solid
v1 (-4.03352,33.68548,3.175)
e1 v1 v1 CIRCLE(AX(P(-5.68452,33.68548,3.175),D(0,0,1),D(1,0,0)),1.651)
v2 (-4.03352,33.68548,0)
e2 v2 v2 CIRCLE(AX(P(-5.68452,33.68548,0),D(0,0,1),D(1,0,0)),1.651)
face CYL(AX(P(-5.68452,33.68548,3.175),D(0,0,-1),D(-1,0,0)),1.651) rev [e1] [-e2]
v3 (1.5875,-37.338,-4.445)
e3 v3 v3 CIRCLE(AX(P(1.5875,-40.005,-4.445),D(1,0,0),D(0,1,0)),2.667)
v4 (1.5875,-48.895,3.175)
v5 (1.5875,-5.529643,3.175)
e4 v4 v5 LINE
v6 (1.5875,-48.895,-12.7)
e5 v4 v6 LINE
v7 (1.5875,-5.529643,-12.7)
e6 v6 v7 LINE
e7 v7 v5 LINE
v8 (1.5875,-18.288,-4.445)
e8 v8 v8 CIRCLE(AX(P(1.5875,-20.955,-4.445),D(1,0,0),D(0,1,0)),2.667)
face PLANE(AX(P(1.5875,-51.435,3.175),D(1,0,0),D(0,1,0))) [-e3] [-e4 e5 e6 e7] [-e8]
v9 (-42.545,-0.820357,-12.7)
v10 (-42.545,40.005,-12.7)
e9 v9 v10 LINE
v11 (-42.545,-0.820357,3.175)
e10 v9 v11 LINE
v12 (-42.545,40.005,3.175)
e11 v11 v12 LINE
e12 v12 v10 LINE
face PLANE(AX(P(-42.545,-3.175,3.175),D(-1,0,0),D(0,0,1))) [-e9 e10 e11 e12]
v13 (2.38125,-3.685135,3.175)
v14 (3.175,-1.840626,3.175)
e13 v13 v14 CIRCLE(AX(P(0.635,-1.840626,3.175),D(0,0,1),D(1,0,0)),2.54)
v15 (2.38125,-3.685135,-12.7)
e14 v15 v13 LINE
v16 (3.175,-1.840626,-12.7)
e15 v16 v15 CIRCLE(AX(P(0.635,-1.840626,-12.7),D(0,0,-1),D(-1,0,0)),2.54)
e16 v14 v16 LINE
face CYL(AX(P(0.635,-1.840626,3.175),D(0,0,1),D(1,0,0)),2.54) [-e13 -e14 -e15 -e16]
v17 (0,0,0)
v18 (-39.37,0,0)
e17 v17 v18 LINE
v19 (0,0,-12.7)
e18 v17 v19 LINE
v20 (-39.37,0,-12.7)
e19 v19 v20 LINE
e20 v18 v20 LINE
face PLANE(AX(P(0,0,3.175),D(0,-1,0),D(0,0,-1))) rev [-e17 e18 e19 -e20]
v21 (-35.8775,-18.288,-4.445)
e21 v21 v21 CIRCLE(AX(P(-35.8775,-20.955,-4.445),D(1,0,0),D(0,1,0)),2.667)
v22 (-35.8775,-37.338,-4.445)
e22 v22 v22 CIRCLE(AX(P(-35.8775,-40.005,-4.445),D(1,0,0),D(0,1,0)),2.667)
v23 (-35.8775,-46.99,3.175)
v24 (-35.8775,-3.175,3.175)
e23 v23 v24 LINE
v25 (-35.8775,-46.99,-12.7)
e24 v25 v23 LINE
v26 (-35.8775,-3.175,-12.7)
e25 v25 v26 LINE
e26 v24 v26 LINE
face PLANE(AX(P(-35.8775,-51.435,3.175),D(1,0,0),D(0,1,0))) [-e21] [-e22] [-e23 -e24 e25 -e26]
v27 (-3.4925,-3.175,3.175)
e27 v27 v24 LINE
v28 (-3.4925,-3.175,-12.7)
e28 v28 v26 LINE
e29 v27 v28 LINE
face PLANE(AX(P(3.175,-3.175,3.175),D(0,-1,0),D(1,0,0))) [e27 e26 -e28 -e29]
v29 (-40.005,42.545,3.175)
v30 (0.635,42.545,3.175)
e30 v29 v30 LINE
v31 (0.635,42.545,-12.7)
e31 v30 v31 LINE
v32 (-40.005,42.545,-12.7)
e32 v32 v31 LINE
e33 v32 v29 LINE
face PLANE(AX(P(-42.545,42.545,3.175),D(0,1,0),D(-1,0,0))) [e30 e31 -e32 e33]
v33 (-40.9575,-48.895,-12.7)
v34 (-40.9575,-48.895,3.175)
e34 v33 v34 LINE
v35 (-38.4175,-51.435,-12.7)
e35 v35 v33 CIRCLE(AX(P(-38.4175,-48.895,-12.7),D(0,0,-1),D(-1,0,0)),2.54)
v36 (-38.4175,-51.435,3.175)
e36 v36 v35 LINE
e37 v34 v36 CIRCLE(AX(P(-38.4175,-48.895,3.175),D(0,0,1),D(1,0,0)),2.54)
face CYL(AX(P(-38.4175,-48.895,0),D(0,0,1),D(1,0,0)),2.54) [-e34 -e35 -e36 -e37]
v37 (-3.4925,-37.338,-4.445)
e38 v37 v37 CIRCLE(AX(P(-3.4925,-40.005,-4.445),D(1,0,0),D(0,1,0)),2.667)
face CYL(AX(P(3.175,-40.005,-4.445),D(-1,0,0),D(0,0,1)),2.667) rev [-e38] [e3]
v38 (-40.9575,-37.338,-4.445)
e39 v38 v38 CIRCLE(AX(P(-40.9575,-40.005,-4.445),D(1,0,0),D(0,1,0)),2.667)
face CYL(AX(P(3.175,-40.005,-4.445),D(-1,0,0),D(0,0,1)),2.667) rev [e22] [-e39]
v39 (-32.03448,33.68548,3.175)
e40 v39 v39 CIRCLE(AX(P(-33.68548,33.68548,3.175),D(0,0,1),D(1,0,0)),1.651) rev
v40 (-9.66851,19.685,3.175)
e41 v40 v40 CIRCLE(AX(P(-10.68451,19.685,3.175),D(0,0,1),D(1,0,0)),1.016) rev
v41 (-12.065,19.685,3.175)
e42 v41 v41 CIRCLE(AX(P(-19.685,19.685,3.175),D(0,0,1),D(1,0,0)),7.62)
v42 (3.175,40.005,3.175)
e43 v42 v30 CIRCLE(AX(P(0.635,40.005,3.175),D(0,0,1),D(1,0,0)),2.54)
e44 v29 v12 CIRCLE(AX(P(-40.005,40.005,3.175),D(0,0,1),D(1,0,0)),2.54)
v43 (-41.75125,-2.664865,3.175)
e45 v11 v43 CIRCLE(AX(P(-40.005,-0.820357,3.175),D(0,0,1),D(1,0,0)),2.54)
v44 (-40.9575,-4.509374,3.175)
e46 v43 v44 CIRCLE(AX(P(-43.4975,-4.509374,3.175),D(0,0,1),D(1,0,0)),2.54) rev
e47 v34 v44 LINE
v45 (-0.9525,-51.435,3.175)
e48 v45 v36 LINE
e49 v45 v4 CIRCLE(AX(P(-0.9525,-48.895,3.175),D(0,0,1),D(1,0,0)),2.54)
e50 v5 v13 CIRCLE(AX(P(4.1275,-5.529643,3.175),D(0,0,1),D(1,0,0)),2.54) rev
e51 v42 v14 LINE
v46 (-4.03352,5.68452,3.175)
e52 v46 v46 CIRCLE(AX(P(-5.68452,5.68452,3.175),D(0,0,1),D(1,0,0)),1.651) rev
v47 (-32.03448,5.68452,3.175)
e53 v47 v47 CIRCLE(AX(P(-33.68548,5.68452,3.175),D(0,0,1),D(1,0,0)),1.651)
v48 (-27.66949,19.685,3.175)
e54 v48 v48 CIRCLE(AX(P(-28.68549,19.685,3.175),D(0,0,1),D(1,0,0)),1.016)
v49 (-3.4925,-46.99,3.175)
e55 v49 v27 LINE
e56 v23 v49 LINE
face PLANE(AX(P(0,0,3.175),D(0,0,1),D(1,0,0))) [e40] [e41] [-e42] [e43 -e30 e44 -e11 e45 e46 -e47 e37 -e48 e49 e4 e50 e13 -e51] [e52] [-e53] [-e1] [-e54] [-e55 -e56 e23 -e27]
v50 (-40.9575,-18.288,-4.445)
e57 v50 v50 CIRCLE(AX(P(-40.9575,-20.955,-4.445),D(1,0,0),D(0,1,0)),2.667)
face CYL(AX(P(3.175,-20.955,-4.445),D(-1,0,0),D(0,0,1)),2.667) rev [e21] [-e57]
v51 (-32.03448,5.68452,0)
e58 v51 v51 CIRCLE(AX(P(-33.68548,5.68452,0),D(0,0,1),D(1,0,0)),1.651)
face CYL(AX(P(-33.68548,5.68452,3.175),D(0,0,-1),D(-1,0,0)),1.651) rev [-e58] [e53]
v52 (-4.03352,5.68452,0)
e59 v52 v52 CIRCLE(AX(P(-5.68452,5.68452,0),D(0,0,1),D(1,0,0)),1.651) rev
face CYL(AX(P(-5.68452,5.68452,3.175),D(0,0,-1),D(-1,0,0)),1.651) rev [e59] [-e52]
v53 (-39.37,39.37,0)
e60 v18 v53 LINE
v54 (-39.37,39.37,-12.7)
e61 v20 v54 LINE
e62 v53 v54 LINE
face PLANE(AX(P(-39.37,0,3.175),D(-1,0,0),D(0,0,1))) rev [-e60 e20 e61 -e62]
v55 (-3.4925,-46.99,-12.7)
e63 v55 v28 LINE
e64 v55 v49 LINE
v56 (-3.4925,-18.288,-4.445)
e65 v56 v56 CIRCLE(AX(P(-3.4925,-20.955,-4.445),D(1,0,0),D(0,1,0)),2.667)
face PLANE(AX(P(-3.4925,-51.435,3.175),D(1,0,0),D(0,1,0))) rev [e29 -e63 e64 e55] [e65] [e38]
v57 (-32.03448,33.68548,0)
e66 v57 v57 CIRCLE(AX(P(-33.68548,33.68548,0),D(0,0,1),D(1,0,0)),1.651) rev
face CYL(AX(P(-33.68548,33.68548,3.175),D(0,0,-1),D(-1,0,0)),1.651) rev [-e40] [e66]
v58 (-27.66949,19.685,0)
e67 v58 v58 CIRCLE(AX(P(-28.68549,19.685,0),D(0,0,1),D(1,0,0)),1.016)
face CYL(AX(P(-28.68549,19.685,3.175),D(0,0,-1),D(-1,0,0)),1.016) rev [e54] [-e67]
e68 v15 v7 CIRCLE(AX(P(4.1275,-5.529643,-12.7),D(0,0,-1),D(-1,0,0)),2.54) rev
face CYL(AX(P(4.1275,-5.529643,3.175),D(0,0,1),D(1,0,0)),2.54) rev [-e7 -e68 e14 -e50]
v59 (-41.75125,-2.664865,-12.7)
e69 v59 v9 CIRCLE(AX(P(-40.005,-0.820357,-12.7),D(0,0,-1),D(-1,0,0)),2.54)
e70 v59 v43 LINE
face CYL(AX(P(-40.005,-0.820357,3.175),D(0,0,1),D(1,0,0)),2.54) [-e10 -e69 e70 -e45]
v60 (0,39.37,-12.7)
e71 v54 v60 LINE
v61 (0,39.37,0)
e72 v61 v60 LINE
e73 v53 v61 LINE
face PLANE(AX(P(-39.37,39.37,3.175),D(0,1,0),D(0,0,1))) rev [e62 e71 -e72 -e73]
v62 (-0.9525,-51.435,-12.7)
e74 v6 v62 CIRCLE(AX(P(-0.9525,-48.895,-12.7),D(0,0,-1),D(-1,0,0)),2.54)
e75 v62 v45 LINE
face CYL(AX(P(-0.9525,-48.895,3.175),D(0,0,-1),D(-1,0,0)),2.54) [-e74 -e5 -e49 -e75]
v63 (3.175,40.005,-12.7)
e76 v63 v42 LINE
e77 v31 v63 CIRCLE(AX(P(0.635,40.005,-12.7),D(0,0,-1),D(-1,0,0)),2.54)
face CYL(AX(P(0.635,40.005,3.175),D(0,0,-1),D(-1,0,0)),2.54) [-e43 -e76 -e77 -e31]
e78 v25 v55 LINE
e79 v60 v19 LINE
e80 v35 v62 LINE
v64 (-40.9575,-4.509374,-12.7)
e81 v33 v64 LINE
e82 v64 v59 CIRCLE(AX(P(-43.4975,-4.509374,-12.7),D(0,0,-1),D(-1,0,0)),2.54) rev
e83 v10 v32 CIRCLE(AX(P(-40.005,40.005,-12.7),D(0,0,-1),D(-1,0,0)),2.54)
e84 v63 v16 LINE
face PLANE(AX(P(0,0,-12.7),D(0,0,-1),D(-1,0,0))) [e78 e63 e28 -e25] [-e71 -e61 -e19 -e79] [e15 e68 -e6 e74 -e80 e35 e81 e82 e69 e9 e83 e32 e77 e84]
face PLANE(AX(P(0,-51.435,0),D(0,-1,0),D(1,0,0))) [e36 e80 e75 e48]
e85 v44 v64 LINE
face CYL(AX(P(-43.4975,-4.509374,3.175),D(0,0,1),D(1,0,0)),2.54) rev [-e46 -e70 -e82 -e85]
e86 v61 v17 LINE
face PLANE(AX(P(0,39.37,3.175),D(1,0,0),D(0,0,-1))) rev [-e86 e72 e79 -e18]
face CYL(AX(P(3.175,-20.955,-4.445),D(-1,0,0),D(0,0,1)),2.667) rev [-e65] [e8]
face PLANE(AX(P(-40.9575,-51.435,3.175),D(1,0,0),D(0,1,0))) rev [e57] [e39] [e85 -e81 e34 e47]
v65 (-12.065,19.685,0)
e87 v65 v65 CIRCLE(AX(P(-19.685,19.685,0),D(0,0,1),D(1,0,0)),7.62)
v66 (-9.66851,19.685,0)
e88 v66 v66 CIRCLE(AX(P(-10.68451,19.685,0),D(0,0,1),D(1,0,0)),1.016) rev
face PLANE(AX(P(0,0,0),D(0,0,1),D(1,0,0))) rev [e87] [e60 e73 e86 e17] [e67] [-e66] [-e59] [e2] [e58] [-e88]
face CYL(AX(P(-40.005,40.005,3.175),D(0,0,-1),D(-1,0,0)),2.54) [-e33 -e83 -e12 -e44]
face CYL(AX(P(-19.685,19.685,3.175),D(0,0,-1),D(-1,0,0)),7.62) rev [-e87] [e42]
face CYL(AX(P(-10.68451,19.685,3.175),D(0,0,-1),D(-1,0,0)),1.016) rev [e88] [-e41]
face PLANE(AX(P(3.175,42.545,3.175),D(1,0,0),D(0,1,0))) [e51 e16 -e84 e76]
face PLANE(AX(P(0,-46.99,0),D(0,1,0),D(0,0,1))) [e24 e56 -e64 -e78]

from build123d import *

# Parameters (mm, degrees)
SKETCH1_W                = 39.37
SKETCH1_H                = 39.37
SKETCH1_R                = 1.651
SKETCH1_R_2              = 7.62
SKETCH1_R_3              = 1.016
BOSS_EXTRUDE1_DEPTH      = 3.175
BOSS_EXTRUDE2_DEPTH      = 12.7
BOSS_EXTRUDE2_DEPTH_BACK = 3.175
SKETCH3_W                = 45.72
SKETCH3_H                = 45.72
SKETCH3_W_2              = 39.37
SKETCH3_H_2              = 39.37
SKETCH5_W                = 5.08
SKETCH5_H                = 15.875
BOSS_EXTRUDE3_DEPTH      = 48.26
SKETCH6_W                = 42.545
SKETCH6_H                = 15.875
BOSS_EXTRUDE4_DEPTH      = 4.445
SKETCH7_R                = 2.667
CUT_EXTRUDE1_DEPTH       = 70.979765826
FILLET1_R                = 2.54
FILLET2_R                = 2.54
FILLET3_R                = 2.54


with BuildPart() as part:
    # Sketch1 → Boss-Extrude1 (new body)
    with BuildSketch(Plane.XY):
        with Locations((-19.685, 19.685)):
            Rectangle(SKETCH1_W, SKETCH1_H)
        with Locations((-33.68548, 5.68452)):
            Circle(SKETCH1_R, mode=Mode.SUBTRACT)
        with Locations((-33.68548, 33.68548)):
            Circle(SKETCH1_R, mode=Mode.SUBTRACT)
        with Locations((-5.68452, 5.68452)):
            Circle(SKETCH1_R, mode=Mode.SUBTRACT)
        with Locations((-5.68452, 33.68548)):
            Circle(SKETCH1_R, mode=Mode.SUBTRACT)
        with Locations((-19.685, 19.685)):
            Circle(SKETCH1_R_2, mode=Mode.SUBTRACT)
        with Locations((-28.68549, 19.685)):
            Circle(SKETCH1_R_3, mode=Mode.SUBTRACT)
        with Locations((-10.68451, 19.685)):
            Circle(SKETCH1_R_3, mode=Mode.SUBTRACT)
    extrude(amount=BOSS_EXTRUDE1_DEPTH)

    # Sketch3 → Boss-Extrude2 (add, two sides: drawn at the far end of the back side and taken through both)
    with BuildSketch(Plane(origin=(0, 0, 0), x_dir=(-1, 0, 0), z_dir=(0, 0, -1)).offset(-BOSS_EXTRUDE2_DEPTH_BACK)):
        with Locations((19.685, 19.685)):
            Rectangle(SKETCH3_W, SKETCH3_H)
        with Locations((19.685, 19.685)):
            Rectangle(SKETCH3_W_2, SKETCH3_H_2, mode=Mode.SUBTRACT)
    extrude(amount=BOSS_EXTRUDE2_DEPTH + BOSS_EXTRUDE2_DEPTH_BACK)

    # Sketch5 → Boss-Extrude3 (add)
    with BuildSketch(Plane(origin=(0, -3.175, 0), x_dir=(-1, 0, 0), z_dir=(0, -1, 0))):
        with Locations((38.4175, 4.7625)):
            Rectangle(SKETCH5_W, SKETCH5_H)
        with Locations((0.9525, 4.7625)):
            Rectangle(SKETCH5_W, SKETCH5_H)
    extrude(amount=BOSS_EXTRUDE3_DEPTH)

    # Sketch6 → Boss-Extrude4 (add)
    with BuildSketch(Plane(origin=(-35.8775, -51.435, -12.7), x_dir=(1, 0, 0), z_dir=(0, 1, 0))):
        with Locations((16.1925, -7.9375)):
            Rectangle(SKETCH6_W, SKETCH6_H)
    extrude(amount=BOSS_EXTRUDE4_DEPTH)

    # Sketch7 → Cut-Extrude1 (cut, through all)
    with BuildSketch(Plane.ZY.offset(42.545)):
        with Locations(Location((-4.445, -40.005, 0), (0, 0, 90))):
            Circle(SKETCH7_R)
        with Locations(Location((-4.445, -20.955, 0), (0, 0, 90))):
            Circle(SKETCH7_R)
    extrude(amount=-CUT_EXTRUDE1_DEPTH, mode=Mode.SUBTRACT)

    # Fillet1
    # the kernel refuses this fillet: 2.54 mm, written as the material it adds along each edge
    with BuildSketch(Plane(origin=(1.5875, -3.175, 3.175), x_dir=(1, 0, 0), z_dir=(0, 0, -1))) as fillet1_piece_1:
        with BuildLine():
            CenterArc((2.54, 2.35464302), FILLET1_R, 180, 67.975687163)
            Line((0, 2.35464302), (0, 0))
            Line((0, 0), (1.5875, 0))
        make_face()
    extrude(amount=15.875)
    # the kernel refuses this fillet: 2.54 mm, written as the material it takes off along each edge
    with BuildSketch(Plane(origin=(-40.9575, -51.435, -19.05), x_dir=(1, 0, 0), z_dir=(0, 0, 1))) as fillet1_2_piece_1:
        with BuildLine():
            CenterArc((FILLET1_R, FILLET1_R), FILLET1_R, 180, 90)
            Line((0, FILLET1_R), (0, 0))
            Line((0, 0), (FILLET1_R, 0))
        make_face()
    extrude(amount=28.575, mode=Mode.SUBTRACT)
    with BuildSketch(Plane(origin=(1.5875, -51.435, 9.525), x_dir=(0, 1, 0), z_dir=(0, 0, -1))) as fillet1_2_piece_2:
        with BuildLine():
            CenterArc((FILLET1_R, -FILLET1_R), FILLET1_R, 90, 90)
            Line((0, -FILLET1_R), (0, 0))
            Line((0, 0), (FILLET1_R, 0))
        make_face()
    extrude(amount=28.575, mode=Mode.SUBTRACT)

    # Fillet2
    # the kernel refuses this fillet: 2.54 mm, written as the material it takes off along each edge
    with BuildSketch(Plane(origin=(-42.545, -3.175, 9.061607549), x_dir=(1, 0, 0), z_dir=(0, 0, -1))) as fillet2_piece_1:
        with BuildLine():
            CenterArc((2.54, -2.35464302), FILLET2_R, 112.024312837, 67.975687163)
            Line((0, -2.35464302), (-0.0508, -2.35464302))
            Line((-0.0508, -2.35464302), (-0.0508, 0))
            Line((-0.0508, 0), (0, 0.0508))
            ThreePointArc((0, 0.0508), (0.79375, 0.0508), (1.56845, 0.04709286))
            Line((1.56845, 0.04709286), (1.5875, 0))
        make_face()
    extrude(amount=27.648215098, mode=Mode.SUBTRACT)
    with BuildSketch(Plane(origin=(3.175, 42.545, -19.05), x_dir=(0, -1, 0), z_dir=(0, 0, 1))) as fillet2_piece_2:
        with BuildLine():
            CenterArc((FILLET2_R, -FILLET2_R), FILLET2_R, 90, 90)
            Line((0, -FILLET2_R), (-FILLET2_R * 0.02, -FILLET2_R))
            Line((-FILLET2_R * 0.02, -FILLET2_R), (-FILLET2_R * 0.02, FILLET2_R * 0.02))
            Line((-FILLET2_R * 0.02, FILLET2_R * 0.02), (FILLET2_R, FILLET2_R * 0.02))
            Line((FILLET2_R, FILLET2_R * 0.02), (FILLET2_R, 0))
        make_face()
    extrude(amount=28.575, mode=Mode.SUBTRACT)
    with BuildSketch(Plane(origin=(-42.545, 42.545, 9.525), x_dir=(1, 0, 0), z_dir=(0, 0, -1))) as fillet2_piece_3:
        with BuildLine():
            CenterArc((FILLET2_R, FILLET2_R), FILLET2_R, 180, 90)
            Line((0, FILLET2_R), (-FILLET2_R * 0.02, FILLET2_R))
            Line((-FILLET2_R * 0.02, FILLET2_R), (-FILLET2_R * 0.02, -FILLET2_R * 0.02))
            Line((-FILLET2_R * 0.02, -FILLET2_R * 0.02), (FILLET2_R, -FILLET2_R * 0.02))
            Line((FILLET2_R, -FILLET2_R * 0.02), (FILLET2_R, 0))
        make_face()
    extrude(amount=28.575, mode=Mode.SUBTRACT)
    with BuildSketch(Plane(origin=(3.175, -3.175, -16.035934044), x_dir=(-0.8412426627142054, -0.5406577313139188, 0), z_dir=(0, 0, 1))) as fillet2_piece_4:
        with BuildLine():
            CenterArc((1.41531695, -2.495802653), FILLET2_R, 100.70411186, 46.567463442)
            Line((-0.721439413, -1.122532015), (-0.76417454, -1.095066602))
            Line((-0.76417454, -1.095066602), (-0.042735127, 0.027465413))
            Line((-0.042735127, 0.027465413), (0.009435446, 0.049916053))
            ThreePointArc((0.009435446, 0.049916053), (0.471772317, 0.006602653), (0.934109187, 0.049916053))
            Line((0.934109187, 0.049916053), (0.943544634, 0))
        make_face()
    extrude(amount=22.546868088, mode=Mode.SUBTRACT)

    # Fillet3
    fillet3_edges = [part.edges().sort_by_distance(p)[0] for p in [
        (-40.9575, -3.175, -4.7625),
    ]]
    fillet(fillet3_edges, radius=FILLET3_R)


solid = part.part
